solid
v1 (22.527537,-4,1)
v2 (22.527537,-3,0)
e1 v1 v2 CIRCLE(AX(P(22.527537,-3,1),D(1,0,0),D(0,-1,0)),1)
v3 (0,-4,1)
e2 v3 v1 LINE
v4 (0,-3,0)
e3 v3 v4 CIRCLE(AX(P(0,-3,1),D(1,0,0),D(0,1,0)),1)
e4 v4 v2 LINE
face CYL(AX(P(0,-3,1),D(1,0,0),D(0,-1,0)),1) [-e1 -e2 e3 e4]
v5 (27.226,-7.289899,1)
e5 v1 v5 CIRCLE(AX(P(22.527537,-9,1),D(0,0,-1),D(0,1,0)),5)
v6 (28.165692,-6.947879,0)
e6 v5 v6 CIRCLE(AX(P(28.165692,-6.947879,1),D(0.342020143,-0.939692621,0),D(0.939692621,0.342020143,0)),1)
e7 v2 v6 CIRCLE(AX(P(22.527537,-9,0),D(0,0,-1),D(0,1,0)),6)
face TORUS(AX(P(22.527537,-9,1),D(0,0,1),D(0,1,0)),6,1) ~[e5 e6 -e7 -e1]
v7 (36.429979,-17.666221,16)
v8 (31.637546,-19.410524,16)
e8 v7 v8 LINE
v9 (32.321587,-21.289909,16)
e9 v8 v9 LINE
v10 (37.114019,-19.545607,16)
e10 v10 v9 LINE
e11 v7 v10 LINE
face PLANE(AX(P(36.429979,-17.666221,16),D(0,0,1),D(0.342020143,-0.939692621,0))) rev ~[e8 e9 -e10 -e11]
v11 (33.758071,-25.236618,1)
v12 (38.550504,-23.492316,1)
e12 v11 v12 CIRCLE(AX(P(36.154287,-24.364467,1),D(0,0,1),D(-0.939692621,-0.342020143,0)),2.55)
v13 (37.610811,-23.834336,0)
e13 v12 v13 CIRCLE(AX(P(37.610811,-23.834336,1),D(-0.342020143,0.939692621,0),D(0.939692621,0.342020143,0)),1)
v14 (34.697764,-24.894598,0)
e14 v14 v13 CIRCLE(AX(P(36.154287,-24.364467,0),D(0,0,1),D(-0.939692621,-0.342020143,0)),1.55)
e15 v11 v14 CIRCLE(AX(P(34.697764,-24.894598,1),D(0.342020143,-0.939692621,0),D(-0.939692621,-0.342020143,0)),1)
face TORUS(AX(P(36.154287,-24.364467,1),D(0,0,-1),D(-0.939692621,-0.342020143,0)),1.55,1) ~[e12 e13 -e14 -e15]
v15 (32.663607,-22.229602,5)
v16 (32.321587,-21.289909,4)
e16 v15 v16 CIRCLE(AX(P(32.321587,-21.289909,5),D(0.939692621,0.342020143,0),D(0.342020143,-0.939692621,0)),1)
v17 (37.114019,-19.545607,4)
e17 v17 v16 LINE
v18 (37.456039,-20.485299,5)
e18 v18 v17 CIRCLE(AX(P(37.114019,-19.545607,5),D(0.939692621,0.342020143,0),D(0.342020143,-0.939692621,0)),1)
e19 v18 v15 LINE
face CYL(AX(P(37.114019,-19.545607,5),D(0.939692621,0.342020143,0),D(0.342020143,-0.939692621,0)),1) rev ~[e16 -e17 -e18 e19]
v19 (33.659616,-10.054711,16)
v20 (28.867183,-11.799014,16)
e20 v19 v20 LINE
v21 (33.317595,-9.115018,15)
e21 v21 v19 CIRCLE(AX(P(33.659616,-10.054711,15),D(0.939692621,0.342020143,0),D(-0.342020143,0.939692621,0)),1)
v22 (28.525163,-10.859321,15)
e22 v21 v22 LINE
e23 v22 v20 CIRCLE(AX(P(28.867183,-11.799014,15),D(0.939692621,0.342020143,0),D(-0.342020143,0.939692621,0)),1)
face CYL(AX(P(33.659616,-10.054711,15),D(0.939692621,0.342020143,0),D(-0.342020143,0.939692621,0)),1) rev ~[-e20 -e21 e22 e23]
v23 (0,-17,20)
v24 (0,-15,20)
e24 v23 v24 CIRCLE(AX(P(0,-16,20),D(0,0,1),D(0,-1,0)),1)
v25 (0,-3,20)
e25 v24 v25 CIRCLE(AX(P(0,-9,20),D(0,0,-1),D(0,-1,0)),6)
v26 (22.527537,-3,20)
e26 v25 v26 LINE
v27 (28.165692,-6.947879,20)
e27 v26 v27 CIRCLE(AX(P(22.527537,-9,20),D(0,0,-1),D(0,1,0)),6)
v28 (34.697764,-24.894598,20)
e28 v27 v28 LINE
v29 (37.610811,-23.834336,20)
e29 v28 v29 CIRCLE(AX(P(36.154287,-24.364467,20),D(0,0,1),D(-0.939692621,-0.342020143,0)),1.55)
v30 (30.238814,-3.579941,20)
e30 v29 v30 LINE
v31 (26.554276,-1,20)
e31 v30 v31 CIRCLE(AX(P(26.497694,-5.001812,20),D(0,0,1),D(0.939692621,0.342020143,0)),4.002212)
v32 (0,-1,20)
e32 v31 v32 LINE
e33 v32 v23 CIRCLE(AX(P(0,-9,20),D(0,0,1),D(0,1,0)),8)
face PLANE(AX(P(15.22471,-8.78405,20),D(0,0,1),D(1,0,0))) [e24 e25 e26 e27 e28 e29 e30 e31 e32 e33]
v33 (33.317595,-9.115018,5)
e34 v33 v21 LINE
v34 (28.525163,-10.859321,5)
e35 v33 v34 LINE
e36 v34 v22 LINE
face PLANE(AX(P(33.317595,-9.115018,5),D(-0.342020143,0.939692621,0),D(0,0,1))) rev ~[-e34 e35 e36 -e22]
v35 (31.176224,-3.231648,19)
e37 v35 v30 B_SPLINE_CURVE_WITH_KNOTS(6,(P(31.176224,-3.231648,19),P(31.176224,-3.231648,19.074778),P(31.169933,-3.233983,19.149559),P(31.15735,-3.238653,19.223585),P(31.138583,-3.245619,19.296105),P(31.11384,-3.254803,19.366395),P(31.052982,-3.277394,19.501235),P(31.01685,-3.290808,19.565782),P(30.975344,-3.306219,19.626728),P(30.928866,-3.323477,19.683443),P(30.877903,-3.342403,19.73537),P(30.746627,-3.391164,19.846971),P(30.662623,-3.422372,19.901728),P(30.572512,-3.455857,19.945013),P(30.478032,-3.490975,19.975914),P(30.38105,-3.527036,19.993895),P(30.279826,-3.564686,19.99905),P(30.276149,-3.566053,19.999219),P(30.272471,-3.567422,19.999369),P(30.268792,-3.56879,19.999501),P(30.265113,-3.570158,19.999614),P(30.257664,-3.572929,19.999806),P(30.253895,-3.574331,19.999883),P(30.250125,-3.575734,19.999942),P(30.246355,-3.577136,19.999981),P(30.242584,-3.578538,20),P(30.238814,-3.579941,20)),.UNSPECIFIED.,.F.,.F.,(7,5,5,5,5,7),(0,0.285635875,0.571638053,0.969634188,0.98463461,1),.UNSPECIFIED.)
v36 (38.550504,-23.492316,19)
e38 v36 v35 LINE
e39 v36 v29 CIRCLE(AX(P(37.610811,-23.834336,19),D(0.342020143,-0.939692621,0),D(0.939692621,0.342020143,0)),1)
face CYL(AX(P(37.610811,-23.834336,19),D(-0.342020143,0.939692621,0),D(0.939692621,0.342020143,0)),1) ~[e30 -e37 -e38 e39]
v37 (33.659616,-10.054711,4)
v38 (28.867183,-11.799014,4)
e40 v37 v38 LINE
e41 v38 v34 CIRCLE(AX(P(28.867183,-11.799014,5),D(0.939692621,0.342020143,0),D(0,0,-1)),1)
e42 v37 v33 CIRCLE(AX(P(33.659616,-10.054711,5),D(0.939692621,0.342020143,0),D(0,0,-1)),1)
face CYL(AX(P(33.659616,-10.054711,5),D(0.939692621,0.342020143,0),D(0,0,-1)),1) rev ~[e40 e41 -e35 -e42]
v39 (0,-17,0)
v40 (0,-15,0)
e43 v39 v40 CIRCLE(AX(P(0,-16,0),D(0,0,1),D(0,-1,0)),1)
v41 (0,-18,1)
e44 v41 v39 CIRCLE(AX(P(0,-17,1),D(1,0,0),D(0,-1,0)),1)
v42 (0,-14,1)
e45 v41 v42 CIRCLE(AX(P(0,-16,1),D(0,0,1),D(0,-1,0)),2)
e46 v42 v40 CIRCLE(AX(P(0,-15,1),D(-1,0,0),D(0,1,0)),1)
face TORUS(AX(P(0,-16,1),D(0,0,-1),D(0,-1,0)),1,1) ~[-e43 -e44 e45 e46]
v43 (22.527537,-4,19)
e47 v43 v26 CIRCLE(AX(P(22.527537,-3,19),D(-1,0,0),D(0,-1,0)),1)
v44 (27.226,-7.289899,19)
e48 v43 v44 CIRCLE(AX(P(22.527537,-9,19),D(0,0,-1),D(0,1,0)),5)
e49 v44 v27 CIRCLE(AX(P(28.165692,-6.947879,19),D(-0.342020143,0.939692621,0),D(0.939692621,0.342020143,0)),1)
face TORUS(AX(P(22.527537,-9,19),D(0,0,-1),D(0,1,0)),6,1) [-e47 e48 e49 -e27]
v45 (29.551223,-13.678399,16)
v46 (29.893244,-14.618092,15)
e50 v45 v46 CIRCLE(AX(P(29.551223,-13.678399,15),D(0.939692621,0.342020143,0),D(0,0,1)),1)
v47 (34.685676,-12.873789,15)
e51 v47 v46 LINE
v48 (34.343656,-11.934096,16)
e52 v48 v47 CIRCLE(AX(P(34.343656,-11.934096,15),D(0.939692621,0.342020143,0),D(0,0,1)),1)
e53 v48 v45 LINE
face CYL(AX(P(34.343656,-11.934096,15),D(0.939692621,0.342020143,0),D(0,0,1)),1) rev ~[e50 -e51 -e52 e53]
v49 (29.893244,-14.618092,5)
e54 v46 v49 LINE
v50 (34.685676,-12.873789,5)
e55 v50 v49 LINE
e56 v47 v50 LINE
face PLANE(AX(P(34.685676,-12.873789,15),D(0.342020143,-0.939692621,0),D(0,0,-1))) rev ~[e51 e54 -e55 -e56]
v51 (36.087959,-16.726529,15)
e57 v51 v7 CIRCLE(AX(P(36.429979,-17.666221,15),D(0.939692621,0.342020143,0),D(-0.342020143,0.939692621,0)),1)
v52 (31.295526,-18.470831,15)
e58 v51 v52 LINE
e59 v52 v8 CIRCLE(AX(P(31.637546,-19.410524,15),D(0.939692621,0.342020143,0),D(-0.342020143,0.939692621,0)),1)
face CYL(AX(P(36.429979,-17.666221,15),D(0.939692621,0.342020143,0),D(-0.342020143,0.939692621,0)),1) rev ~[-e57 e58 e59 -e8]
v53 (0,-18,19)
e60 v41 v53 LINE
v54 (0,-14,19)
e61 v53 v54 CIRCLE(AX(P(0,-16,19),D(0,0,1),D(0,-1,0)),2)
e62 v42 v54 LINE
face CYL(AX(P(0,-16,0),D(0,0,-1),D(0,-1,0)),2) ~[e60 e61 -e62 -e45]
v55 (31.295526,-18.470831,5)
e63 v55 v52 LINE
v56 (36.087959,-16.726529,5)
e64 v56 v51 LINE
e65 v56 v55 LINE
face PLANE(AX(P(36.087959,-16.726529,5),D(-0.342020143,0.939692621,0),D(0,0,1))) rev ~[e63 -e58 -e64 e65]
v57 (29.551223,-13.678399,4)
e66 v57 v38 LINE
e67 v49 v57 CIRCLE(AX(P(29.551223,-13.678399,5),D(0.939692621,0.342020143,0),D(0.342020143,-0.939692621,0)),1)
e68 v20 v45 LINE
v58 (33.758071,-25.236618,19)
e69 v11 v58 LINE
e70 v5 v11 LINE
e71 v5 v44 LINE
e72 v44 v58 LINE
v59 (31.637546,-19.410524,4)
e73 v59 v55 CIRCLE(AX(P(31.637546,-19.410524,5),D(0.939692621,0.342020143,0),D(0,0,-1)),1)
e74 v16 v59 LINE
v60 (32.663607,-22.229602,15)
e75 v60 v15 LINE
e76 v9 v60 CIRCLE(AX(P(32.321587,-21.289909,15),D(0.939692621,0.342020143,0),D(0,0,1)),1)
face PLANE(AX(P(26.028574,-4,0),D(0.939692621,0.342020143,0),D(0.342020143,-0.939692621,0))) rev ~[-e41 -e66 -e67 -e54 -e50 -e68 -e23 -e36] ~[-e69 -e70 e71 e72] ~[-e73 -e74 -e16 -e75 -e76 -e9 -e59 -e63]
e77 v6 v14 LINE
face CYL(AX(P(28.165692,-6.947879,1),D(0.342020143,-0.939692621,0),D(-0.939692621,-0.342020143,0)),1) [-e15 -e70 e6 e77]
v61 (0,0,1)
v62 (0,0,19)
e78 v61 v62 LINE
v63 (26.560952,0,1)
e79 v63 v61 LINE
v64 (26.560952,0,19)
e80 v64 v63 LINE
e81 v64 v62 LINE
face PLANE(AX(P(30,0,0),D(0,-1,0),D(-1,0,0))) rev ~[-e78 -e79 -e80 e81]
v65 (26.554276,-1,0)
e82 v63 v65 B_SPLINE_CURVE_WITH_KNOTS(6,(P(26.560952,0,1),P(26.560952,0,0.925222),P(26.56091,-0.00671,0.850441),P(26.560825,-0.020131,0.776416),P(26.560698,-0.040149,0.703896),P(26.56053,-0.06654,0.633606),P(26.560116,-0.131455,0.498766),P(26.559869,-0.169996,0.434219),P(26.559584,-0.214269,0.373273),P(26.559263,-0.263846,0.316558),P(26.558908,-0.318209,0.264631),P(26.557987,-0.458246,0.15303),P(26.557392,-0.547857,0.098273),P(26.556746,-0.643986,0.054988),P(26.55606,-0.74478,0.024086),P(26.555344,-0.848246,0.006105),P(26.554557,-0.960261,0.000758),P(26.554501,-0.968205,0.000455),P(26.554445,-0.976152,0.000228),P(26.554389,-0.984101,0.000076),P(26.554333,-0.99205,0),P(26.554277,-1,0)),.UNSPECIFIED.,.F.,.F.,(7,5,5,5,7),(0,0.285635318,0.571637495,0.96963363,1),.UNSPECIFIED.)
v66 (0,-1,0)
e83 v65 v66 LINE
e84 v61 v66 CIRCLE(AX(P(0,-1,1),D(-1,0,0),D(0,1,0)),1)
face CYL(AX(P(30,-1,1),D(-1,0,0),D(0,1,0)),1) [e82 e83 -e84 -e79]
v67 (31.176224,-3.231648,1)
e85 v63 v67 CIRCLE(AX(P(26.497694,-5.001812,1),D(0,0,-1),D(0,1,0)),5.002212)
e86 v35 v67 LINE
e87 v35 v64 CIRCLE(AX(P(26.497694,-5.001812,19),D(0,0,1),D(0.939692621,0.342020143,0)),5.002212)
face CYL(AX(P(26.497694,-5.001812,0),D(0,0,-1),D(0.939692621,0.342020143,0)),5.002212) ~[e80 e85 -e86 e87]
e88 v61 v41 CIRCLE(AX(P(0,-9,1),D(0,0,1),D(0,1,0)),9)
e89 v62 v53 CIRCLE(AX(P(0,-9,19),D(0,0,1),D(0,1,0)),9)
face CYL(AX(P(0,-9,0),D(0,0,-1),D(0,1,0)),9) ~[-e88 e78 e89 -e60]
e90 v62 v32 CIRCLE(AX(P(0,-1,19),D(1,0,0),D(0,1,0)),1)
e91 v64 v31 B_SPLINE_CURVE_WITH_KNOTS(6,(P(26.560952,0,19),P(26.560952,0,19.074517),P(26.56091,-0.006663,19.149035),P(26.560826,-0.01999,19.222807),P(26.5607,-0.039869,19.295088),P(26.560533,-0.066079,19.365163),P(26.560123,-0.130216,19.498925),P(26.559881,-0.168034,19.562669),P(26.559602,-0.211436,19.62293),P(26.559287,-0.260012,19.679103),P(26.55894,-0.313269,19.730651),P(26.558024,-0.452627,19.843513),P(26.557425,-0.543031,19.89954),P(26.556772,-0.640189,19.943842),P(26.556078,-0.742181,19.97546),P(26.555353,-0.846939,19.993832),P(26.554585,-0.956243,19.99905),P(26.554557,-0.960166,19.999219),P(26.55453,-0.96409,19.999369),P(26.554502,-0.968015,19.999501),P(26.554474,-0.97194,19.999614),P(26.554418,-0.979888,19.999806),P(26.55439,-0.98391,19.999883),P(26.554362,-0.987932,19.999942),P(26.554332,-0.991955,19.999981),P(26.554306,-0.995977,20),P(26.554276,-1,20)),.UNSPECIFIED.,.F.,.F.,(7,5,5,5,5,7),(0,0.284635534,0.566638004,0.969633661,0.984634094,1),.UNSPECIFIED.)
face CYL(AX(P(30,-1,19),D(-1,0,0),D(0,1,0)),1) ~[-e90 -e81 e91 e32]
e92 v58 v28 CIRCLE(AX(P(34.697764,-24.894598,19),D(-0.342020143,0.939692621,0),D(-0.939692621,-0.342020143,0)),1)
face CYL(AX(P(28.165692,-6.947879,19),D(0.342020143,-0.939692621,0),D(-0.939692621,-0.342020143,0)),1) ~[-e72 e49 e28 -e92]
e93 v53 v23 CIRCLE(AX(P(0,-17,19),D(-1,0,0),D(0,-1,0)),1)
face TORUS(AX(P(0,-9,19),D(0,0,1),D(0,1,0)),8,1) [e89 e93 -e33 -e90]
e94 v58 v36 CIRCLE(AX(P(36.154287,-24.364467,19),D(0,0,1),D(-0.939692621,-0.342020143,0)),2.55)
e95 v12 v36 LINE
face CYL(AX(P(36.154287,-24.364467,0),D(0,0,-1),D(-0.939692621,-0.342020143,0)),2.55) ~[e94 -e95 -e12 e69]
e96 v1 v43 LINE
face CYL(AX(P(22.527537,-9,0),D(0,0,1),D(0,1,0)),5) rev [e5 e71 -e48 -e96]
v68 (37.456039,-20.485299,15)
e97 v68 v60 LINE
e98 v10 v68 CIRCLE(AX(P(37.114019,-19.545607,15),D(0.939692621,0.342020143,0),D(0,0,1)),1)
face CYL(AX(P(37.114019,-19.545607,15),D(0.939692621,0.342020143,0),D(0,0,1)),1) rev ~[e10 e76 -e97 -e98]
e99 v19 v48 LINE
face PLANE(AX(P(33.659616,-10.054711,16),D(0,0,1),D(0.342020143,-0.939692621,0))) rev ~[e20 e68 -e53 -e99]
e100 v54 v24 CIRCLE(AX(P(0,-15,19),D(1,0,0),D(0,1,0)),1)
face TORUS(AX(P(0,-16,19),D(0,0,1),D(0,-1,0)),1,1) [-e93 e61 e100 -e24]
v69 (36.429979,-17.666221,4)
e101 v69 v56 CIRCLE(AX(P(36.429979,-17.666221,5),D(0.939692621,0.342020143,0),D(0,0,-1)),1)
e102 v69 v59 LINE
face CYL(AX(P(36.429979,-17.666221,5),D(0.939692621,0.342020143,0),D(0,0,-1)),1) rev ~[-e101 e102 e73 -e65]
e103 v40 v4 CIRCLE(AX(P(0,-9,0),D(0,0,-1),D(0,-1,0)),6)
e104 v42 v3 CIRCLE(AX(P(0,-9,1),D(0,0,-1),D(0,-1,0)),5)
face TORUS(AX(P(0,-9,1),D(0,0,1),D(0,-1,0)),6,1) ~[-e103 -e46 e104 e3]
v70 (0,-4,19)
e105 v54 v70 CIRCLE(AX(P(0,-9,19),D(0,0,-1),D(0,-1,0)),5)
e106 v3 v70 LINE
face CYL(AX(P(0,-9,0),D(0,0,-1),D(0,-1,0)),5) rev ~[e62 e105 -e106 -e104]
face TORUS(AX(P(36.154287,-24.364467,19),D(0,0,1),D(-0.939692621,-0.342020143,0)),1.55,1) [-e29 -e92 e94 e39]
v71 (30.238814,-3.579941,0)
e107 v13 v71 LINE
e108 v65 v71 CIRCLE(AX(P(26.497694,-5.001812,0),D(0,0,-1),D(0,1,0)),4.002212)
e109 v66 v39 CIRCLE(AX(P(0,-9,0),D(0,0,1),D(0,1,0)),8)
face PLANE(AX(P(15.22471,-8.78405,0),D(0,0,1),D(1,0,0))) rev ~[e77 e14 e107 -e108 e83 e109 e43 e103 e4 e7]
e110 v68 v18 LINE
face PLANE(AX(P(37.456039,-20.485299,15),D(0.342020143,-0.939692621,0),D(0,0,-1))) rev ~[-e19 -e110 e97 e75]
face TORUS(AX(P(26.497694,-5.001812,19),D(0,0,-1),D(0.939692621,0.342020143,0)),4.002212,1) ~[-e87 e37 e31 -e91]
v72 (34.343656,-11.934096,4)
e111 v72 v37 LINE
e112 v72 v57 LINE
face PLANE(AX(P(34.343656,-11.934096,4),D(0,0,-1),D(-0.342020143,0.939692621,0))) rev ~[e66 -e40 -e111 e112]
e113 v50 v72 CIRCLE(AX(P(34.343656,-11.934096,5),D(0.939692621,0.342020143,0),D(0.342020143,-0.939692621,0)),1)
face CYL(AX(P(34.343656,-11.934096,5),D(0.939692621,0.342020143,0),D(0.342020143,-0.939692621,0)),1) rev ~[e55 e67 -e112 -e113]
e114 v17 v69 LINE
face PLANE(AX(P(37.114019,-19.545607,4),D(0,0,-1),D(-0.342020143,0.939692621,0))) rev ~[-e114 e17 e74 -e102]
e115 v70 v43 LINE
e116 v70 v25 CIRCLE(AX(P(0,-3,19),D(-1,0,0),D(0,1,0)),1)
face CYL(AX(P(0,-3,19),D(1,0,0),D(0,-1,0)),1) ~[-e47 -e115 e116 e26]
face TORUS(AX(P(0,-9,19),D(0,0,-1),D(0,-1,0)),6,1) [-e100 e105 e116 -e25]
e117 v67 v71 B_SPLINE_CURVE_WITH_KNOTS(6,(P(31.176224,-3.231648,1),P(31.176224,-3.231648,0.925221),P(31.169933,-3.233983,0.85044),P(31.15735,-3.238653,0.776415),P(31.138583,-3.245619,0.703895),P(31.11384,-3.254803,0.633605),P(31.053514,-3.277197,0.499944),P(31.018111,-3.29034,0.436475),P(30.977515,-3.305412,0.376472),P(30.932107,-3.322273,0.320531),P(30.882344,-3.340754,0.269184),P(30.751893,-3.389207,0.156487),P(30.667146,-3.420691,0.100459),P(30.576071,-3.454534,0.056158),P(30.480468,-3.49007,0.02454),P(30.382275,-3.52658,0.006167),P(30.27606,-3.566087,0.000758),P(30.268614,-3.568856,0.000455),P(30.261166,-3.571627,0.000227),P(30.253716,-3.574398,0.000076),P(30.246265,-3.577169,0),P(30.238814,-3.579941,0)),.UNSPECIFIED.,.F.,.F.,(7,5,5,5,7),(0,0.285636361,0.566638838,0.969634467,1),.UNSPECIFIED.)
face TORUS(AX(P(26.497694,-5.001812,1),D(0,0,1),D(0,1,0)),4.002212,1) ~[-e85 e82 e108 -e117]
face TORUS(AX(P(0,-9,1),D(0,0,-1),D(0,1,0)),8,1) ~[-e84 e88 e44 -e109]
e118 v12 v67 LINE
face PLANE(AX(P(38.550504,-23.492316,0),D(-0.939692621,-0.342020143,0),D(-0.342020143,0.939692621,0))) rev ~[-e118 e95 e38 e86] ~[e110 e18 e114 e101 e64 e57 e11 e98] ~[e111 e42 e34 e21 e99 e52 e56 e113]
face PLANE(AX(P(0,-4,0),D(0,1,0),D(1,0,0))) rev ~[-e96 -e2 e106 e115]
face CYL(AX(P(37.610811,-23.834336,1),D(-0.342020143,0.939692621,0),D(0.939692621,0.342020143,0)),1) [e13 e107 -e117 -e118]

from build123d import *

# Parameters (mm, degrees)
F1_DEPTH    = 20
F3_DEPTH    = 5.1
F4_R        = 5
F5_R        = 1
F6_R        = 1
F7_T1_DEPTH = 20
F7_T4_ANGLE = 70
F7_T6_ANGLE = 70


# Not quite as in the source:
# - a fillet or chamfer that OpenCascade refuses, or shapes differently, is made with other operations: its cross-section is extruded or revolved along the edge and cut away or added


with BuildPart() as f1:
    # F0 (on Top) → F1 (new body)
    with BuildSketch(Plane.XY):
        with BuildLine():
            Line((30, 0), (0, 0))
            ThreePointArc((0, 0), (-9, -9), (0, -18))
            ThreePointArc((0, -18), (2, -16), (0, -14))
            ThreePointArc((0, -14), (-5, -9), (0, -4))
            Line((0, -4), (26.0285742974, -4))
            Line((26.0285742974, -4), (33.7580712171, -25.2366182506))
            ThreePointArc((33.7580712171, -25.2366182506), (37.0264387656, -26.7606830681), (38.5505035831, -23.4923155196))
            Line((38.5505035831, -23.4923155196), (30, 0))
        make_face()
    extrude(amount=F1_DEPTH)

    # F2 (on face) → F3 (cut, through all)
    with BuildSketch(Plane(origin=(26.4906666468, 9.6418141453, 0), x_dir=(-0.3420201433, 0.9396926208, 0), z_dir=(0.9396926208, 0.3420201433, 0))):
        with BuildLine():
            ThreePointArc((-19.9606042998, 15), (-20.2534975186, 15.7071067812), (-20.9606042998, 16))
            Line((-20.9606042998, 16), (-22.9606042998, 16))
            ThreePointArc((-22.9606042998, 16), (-23.667711081, 15.7071067812), (-23.9606042998, 15))
            Line((-23.9606042998, 15), (-23.9606042998, 5))
            ThreePointArc((-23.9606042998, 5), (-23.667711081, 4.2928932188), (-22.9606042998, 4))
            Line((-22.9606042998, 4), (-20.9606042998, 4))
            ThreePointArc((-20.9606042998, 4), (-20.2534975186, 4.2928932188), (-19.9606042998, 5))
            Line((-19.9606042998, 5), (-19.9606042998, 15))
        make_face()
        with BuildLine():
            ThreePointArc((-28.0606042998, 15), (-28.3534975186, 15.7071067812), (-29.0606042998, 16))
            Line((-29.0606042998, 16), (-31.0606042998, 16))
            ThreePointArc((-31.0606042998, 16), (-31.767711081, 15.7071067812), (-32.0606042998, 15))
            Line((-32.0606042998, 15), (-32.0606042998, 5))
            ThreePointArc((-32.0606042998, 5), (-31.767711081, 4.2928932188), (-31.0606042998, 4))
            Line((-31.0606042998, 4), (-29.0606042998, 4))
            ThreePointArc((-29.0606042998, 4), (-28.3534975186, 4.2928932188), (-28.0606042998, 5))
            Line((-28.0606042998, 5), (-28.0606042998, 15))
        make_face()
    extrude(amount=-F3_DEPTH, mode=Mode.SUBTRACT)

    # F4
    f4_edges = [f1.edges().sort_by_distance(p)[0] for p in [
        (26.028574, -4, 10),
    ]]
    fillet(f4_edges, radius=F4_R)

    # F5
    f5_edges = [f1.edges().sort_by_distance(p)[0] for p in [
        (15, 0, 20),
        (11.263768, -4, 20),
        (25.395419, -4.90424, 20),
        (-5, -9, 20),
        (30.492035, -16.263259, 20),
        (2, -16, 20),
        (37.026439, -26.760683, 20),
        (-9, -9, 20),
        (34.275252, -11.746158, 20),
    ]]
    fillet(f5_edges, radius=F5_R)

    # F6
    f6_edges = [f1.edges().sort_by_distance(p)[0] for p in [
        (11.263768, -4, 0),
        (25.395419, -4.90424, 0),
        (-5, -9, 0),
        (30.492035, -16.263259, 0),
        (2, -16, 0),
        (37.026439, -26.760683, 0),
        (-9, -9, 0),
        (34.275252, -11.746158, 0),
        (15, 0, 0),
    ]]
    fillet(f6_edges, radius=F6_R)

    # F7: fillet of radius 5 on 1 edges, made by hand

    # F7_s2 → F7_t1 (cut)
    with BuildSketch(Plane.XY):
        with BuildLine():
            ThreePointArc((31.1982351897, -3.290954605), (29.3668444907, -0.9042397786), (26.497693671, 0.0004))
            Line((26.497693671, 0.0004), (26.497693671, 0.5006211803))
            ThreePointArc((26.497693671, 0.5006211803), (28.2488468355, 0.5002211803), (30, 0.5002211803))
            Line((30, 0.5002211803), (30.4700541519, 0.1710857198))
            ThreePointArc((30.4700541519, 0.1710857198), (31.0689838082, -1.4744599868), (31.6682893415, -3.1198688852))
            Line((31.6682893415, -3.1198688852), (31.1982351897, -3.290954605))
        make_face()
    extrude(amount=F7_T1_DEPTH, mode=Mode.SUBTRACT)

    # F7_s3 → F7_t4 (revolve, cut)
    with BuildSketch(Plane.YZ.offset(26.497693671)):
        with BuildLine():
            ThreePointArc((-0.9996, 0), (-0.2924932188, 0.2928932188), (0.0004, 1))
            Line((0.0004, 1), (0.0004, 0))
            Line((0.0004, 0), (-0.9996, 0))
        make_face()
    revolve(axis=Axis((26.497693671, -5.0018118027, 0), (0, 0, -1)), revolution_arc=F7_T4_ANGLE, mode=Mode.SUBTRACT)

    # F7_s5 → F7_t6 (revolve, cut)
    with BuildSketch(Plane(origin=(4.7071926658, -12.9329055584, 0), x_dir=(0, 0, 1), z_dir=(0.3420201433, -0.9396926208, 0))):
        with BuildLine():
            ThreePointArc((20, -27.1911786236), (19.7071067812, -27.8982854048), (19, -28.1911786236))
            Line((19, -28.1911786236), (20, -28.1911786236))
            Line((20, -28.1911786236), (20, -27.1911786236))
        make_face()
    revolve(axis=Axis((26.497693671, -5.0018118027, 20), (0, 0, 1)), revolution_arc=F7_T6_ANGLE, mode=Mode.SUBTRACT)


solid = f1.part
